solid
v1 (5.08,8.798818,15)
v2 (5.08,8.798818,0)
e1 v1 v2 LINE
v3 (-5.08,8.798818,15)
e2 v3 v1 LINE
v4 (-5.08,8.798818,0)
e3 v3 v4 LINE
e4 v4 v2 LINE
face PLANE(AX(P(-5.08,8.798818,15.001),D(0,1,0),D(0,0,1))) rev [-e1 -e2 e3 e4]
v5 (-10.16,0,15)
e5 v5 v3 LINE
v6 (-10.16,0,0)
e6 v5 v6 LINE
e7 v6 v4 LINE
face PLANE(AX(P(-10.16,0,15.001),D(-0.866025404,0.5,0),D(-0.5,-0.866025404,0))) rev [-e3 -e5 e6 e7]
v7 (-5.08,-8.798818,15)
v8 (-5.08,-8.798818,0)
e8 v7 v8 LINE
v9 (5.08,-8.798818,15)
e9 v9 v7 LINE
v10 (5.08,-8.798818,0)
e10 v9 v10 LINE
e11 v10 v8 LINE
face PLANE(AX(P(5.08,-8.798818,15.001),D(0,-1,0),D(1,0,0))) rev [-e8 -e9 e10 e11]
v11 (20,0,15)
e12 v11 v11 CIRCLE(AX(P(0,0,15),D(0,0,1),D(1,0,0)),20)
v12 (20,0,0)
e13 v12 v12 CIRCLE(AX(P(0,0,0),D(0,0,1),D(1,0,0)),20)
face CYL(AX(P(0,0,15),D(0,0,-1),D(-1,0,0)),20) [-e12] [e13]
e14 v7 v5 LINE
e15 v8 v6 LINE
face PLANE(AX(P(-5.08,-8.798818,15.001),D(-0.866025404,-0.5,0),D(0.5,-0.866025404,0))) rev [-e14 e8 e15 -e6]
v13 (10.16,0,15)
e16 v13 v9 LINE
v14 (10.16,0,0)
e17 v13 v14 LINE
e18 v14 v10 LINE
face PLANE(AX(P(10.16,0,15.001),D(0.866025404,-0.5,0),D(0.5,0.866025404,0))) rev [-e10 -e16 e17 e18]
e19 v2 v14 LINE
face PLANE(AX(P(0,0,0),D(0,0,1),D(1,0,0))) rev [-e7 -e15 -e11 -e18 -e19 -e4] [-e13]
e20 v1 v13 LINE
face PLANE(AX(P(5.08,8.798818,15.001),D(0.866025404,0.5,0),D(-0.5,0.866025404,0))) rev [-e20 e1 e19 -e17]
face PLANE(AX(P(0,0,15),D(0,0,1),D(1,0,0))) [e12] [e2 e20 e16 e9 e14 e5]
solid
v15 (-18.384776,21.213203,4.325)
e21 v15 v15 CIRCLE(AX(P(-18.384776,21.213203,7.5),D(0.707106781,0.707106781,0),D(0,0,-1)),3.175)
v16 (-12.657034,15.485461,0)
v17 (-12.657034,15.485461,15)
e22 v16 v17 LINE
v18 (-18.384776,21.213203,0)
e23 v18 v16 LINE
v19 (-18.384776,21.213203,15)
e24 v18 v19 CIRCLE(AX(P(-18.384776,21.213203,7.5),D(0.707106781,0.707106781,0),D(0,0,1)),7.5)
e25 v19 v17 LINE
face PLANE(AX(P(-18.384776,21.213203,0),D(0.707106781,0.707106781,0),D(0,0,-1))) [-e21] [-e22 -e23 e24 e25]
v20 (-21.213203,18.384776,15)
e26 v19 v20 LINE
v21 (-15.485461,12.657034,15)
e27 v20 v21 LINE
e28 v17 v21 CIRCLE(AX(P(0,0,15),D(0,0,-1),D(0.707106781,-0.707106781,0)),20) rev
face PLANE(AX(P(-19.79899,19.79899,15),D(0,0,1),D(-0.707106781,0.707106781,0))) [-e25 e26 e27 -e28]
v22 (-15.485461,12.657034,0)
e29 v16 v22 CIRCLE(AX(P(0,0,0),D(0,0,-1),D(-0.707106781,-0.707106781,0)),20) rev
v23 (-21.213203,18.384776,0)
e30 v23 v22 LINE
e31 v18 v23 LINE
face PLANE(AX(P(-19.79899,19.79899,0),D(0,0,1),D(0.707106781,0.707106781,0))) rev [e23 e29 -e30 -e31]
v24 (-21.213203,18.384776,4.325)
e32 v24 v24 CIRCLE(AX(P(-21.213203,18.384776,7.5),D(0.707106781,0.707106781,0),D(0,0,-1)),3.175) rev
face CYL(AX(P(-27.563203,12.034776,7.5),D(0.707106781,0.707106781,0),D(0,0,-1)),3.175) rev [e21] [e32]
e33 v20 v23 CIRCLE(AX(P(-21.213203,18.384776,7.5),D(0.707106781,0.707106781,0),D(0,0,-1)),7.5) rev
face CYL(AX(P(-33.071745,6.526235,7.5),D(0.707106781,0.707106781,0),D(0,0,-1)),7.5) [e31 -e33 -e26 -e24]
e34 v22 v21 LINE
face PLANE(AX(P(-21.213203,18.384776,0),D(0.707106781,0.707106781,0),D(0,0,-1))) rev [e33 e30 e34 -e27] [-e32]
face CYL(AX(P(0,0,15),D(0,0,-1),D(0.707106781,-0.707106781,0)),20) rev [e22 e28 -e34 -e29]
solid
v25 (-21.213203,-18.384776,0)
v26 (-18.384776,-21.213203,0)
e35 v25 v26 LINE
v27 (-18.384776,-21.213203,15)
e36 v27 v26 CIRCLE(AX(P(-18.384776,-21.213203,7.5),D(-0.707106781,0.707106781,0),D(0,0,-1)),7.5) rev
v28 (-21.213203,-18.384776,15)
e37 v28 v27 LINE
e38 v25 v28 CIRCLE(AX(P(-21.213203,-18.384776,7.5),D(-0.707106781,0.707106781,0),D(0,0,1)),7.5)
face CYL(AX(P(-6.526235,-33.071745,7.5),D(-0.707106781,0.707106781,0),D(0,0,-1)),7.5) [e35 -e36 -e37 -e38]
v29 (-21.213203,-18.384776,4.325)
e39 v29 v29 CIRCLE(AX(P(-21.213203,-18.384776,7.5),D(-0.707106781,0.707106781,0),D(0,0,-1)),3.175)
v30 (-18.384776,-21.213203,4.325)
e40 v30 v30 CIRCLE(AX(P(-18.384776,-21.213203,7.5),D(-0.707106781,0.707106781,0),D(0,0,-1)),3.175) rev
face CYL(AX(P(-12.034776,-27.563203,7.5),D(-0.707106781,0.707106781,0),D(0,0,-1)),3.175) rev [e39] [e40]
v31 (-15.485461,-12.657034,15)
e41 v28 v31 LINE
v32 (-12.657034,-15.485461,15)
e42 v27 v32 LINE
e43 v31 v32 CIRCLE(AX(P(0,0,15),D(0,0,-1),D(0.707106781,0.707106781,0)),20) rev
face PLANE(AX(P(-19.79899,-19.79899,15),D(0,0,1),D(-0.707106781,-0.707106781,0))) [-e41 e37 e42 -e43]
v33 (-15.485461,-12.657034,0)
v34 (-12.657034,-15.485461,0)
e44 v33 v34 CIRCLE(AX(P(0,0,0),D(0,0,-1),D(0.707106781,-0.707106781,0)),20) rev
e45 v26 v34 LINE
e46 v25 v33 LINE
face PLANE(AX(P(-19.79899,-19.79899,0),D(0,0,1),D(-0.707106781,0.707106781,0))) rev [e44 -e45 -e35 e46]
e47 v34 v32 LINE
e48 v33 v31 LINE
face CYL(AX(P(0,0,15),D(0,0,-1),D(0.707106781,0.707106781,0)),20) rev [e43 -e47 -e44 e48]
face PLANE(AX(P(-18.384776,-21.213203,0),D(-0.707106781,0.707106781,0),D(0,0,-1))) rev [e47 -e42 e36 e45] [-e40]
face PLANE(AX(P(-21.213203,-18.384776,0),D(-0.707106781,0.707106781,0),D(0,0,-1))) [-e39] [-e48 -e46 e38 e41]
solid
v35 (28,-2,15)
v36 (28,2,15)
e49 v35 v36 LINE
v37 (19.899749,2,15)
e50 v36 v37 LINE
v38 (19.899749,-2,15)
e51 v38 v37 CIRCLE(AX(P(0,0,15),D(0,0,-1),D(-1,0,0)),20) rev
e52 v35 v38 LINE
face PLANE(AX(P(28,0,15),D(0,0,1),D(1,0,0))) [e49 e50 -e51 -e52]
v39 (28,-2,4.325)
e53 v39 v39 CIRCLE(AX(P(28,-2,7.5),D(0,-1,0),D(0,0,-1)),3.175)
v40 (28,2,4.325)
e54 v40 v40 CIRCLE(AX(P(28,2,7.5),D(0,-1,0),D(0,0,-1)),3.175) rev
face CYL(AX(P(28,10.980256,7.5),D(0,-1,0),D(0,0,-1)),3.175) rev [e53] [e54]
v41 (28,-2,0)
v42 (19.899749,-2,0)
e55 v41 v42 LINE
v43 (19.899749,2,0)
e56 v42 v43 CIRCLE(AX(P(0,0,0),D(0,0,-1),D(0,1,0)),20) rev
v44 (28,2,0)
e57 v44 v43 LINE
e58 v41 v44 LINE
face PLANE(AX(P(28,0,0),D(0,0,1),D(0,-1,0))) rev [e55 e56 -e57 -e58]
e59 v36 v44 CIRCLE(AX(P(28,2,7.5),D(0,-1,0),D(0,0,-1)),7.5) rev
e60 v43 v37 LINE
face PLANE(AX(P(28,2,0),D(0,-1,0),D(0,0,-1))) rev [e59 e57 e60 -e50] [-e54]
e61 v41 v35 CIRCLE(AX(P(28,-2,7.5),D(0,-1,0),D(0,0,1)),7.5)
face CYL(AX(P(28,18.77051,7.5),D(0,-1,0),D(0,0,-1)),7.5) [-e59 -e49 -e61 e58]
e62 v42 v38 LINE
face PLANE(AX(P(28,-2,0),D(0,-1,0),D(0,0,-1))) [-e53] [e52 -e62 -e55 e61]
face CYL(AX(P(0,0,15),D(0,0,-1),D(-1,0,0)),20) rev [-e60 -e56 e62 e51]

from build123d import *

# Parameters (mm, degrees)
SKETCH1_R                            = 20
SKETCH1_R_2                          = 2.5
BOSS_EXTRUDE1_DEPTH                  = 15
SKETCH5_W                            = 15
SKETCH5_H                            = 2
BOSS_EXTRUDE2_DEPTH                  = 8
BOSS_EXTRUDE2_DIRECTION_2_REACH      = 49.17
BOSS_EXTRUDE2_DIRECTION_2_END_RADIUS = 20
BOSS_EXTRUDE3_DEPTH                  = 4
SKETCH7_R                            = 3.175
CUT_EXTRUDE1_DEPTH                   = 4
CIRPATTERN2_ANGLE                    = 135
CIRPATTERN2_2_ANGLE                  = 135
CUT_EXTRUDE2_DEPTH                   = 15


with BuildPart() as part:
    # Sketch1 → Boss-Extrude1 (new body)
    with BuildSketch(Plane.XY):
        Circle(SKETCH1_R)
        Circle(SKETCH1_R_2, mode=Mode.SUBTRACT)
    extrude(amount=BOSS_EXTRUDE1_DEPTH)

    # Sketch8 → Cut-Extrude2 (cut)
    with BuildSketch(Plane(origin=(0, 0, 0), x_dir=(-1, 0, 0), z_dir=(0, 0, -1))):
        Polygon((-5.08, -8.798818102), (5.08, -8.798818102), (10.16, 0), (5.08, 8.798818102), (-5.08, 8.798818102), (-10.16, 0), align=None)
    extrude(amount=-CUT_EXTRUDE2_DEPTH, mode=Mode.SUBTRACT)


with BuildPart() as body_2:
    # Sketch5 → Boss-Extrude2 (new body)
    with BuildSketch(Plane(origin=(20, 0, 0), x_dir=(0, 0, -1), z_dir=(1, 0, 0))):
        with Locations((-7.5, 1)):
            Rectangle(SKETCH5_W, SKETCH5_H)
        with Locations((-7.5, -1)):
            Rectangle(SKETCH5_W, SKETCH5_H)
    extrude(amount=BOSS_EXTRUDE2_DEPTH)

    # Boss-Extrude2 direction 2: up to this cylinder (the profile starts outside it)
    boss_extrude2_direction_2_end = Plane(origin=(0, 0, 7.5), z_dir=(0, 0, -1)) * Cylinder(BOSS_EXTRUDE2_DIRECTION_2_END_RADIUS, 139.34, mode=Mode.PRIVATE)
    # Sketch5 → Boss-Extrude2 direction 2 (add, up to the surface)
    with BuildSketch(Plane(origin=(20, 0, 0), x_dir=(0, 0, -1), z_dir=(1, 0, 0)), mode=Mode.PRIVATE) as boss_extrude2_direction_2_sk1:
        with Locations((-7.5, 1)):
            Rectangle(SKETCH5_W, SKETCH5_H)
    boss_extrude2_direction_2_tool1 = extrude(boss_extrude2_direction_2_sk1.sketch, amount=-BOSS_EXTRUDE2_DIRECTION_2_REACH, mode=Mode.PRIVATE) - boss_extrude2_direction_2_end
    add(boss_extrude2_direction_2_tool1.solids().sort_by_distance((20, 1, 7.5))[0])
    # Sketch5 → Boss-Extrude2 direction 2 (add, up to the surface)
    with BuildSketch(Plane(origin=(20, 0, 0), x_dir=(0, 0, -1), z_dir=(1, 0, 0)), mode=Mode.PRIVATE) as boss_extrude2_direction_2_sk2:
        with Locations((-7.5, -1)):
            Rectangle(SKETCH5_W, SKETCH5_H)
    boss_extrude2_direction_2_tool2 = extrude(boss_extrude2_direction_2_sk2.sketch, amount=-BOSS_EXTRUDE2_DIRECTION_2_REACH, mode=Mode.PRIVATE) - boss_extrude2_direction_2_end
    add(boss_extrude2_direction_2_tool2.solids().sort_by_distance((20, -1, 7.5))[0])

    # Sketch6 → Boss-Extrude3 (add)
    with BuildSketch(Plane(origin=(0, -2, 0), x_dir=(-1, 0, 0), z_dir=(0, -1, 0))):
        with BuildLine():
            Line((-28, -15), (-28, 0))
            ThreePointArc((-28, 0), (-35.5, -7.5), (-28, -15))
        make_face()
    extrude(amount=-BOSS_EXTRUDE3_DEPTH)

    # Sketch7 → Cut-Extrude1 (cut)
    with BuildSketch(Plane(origin=(0, -2, 0), x_dir=(-1, 0, 0), z_dir=(0, -1, 0))):
        with Locations(Location((-28, -7.5, 0), (0, 0, 90))):
            Circle(SKETCH7_R)
    extrude(amount=-CUT_EXTRUDE1_DEPTH, mode=Mode.SUBTRACT)


with BuildPart() as body_3:
    # CirPattern2: read off the stored shape, not the designer's step
    # CirPattern2: copy of body 2
    add(body_2.part.rotate(Axis((0, 0, 0), (0, 0, 1)), CIRPATTERN2_ANGLE))


with BuildPart() as body_4:
    # CirPattern2 2: copy of body 2
    add(body_2.part.rotate(Axis((0, 0, 0), (0, 0, -1)), CIRPATTERN2_2_ANGLE))


solid = Compound([part.part, body_2.part, body_3.part, body_4.part])
